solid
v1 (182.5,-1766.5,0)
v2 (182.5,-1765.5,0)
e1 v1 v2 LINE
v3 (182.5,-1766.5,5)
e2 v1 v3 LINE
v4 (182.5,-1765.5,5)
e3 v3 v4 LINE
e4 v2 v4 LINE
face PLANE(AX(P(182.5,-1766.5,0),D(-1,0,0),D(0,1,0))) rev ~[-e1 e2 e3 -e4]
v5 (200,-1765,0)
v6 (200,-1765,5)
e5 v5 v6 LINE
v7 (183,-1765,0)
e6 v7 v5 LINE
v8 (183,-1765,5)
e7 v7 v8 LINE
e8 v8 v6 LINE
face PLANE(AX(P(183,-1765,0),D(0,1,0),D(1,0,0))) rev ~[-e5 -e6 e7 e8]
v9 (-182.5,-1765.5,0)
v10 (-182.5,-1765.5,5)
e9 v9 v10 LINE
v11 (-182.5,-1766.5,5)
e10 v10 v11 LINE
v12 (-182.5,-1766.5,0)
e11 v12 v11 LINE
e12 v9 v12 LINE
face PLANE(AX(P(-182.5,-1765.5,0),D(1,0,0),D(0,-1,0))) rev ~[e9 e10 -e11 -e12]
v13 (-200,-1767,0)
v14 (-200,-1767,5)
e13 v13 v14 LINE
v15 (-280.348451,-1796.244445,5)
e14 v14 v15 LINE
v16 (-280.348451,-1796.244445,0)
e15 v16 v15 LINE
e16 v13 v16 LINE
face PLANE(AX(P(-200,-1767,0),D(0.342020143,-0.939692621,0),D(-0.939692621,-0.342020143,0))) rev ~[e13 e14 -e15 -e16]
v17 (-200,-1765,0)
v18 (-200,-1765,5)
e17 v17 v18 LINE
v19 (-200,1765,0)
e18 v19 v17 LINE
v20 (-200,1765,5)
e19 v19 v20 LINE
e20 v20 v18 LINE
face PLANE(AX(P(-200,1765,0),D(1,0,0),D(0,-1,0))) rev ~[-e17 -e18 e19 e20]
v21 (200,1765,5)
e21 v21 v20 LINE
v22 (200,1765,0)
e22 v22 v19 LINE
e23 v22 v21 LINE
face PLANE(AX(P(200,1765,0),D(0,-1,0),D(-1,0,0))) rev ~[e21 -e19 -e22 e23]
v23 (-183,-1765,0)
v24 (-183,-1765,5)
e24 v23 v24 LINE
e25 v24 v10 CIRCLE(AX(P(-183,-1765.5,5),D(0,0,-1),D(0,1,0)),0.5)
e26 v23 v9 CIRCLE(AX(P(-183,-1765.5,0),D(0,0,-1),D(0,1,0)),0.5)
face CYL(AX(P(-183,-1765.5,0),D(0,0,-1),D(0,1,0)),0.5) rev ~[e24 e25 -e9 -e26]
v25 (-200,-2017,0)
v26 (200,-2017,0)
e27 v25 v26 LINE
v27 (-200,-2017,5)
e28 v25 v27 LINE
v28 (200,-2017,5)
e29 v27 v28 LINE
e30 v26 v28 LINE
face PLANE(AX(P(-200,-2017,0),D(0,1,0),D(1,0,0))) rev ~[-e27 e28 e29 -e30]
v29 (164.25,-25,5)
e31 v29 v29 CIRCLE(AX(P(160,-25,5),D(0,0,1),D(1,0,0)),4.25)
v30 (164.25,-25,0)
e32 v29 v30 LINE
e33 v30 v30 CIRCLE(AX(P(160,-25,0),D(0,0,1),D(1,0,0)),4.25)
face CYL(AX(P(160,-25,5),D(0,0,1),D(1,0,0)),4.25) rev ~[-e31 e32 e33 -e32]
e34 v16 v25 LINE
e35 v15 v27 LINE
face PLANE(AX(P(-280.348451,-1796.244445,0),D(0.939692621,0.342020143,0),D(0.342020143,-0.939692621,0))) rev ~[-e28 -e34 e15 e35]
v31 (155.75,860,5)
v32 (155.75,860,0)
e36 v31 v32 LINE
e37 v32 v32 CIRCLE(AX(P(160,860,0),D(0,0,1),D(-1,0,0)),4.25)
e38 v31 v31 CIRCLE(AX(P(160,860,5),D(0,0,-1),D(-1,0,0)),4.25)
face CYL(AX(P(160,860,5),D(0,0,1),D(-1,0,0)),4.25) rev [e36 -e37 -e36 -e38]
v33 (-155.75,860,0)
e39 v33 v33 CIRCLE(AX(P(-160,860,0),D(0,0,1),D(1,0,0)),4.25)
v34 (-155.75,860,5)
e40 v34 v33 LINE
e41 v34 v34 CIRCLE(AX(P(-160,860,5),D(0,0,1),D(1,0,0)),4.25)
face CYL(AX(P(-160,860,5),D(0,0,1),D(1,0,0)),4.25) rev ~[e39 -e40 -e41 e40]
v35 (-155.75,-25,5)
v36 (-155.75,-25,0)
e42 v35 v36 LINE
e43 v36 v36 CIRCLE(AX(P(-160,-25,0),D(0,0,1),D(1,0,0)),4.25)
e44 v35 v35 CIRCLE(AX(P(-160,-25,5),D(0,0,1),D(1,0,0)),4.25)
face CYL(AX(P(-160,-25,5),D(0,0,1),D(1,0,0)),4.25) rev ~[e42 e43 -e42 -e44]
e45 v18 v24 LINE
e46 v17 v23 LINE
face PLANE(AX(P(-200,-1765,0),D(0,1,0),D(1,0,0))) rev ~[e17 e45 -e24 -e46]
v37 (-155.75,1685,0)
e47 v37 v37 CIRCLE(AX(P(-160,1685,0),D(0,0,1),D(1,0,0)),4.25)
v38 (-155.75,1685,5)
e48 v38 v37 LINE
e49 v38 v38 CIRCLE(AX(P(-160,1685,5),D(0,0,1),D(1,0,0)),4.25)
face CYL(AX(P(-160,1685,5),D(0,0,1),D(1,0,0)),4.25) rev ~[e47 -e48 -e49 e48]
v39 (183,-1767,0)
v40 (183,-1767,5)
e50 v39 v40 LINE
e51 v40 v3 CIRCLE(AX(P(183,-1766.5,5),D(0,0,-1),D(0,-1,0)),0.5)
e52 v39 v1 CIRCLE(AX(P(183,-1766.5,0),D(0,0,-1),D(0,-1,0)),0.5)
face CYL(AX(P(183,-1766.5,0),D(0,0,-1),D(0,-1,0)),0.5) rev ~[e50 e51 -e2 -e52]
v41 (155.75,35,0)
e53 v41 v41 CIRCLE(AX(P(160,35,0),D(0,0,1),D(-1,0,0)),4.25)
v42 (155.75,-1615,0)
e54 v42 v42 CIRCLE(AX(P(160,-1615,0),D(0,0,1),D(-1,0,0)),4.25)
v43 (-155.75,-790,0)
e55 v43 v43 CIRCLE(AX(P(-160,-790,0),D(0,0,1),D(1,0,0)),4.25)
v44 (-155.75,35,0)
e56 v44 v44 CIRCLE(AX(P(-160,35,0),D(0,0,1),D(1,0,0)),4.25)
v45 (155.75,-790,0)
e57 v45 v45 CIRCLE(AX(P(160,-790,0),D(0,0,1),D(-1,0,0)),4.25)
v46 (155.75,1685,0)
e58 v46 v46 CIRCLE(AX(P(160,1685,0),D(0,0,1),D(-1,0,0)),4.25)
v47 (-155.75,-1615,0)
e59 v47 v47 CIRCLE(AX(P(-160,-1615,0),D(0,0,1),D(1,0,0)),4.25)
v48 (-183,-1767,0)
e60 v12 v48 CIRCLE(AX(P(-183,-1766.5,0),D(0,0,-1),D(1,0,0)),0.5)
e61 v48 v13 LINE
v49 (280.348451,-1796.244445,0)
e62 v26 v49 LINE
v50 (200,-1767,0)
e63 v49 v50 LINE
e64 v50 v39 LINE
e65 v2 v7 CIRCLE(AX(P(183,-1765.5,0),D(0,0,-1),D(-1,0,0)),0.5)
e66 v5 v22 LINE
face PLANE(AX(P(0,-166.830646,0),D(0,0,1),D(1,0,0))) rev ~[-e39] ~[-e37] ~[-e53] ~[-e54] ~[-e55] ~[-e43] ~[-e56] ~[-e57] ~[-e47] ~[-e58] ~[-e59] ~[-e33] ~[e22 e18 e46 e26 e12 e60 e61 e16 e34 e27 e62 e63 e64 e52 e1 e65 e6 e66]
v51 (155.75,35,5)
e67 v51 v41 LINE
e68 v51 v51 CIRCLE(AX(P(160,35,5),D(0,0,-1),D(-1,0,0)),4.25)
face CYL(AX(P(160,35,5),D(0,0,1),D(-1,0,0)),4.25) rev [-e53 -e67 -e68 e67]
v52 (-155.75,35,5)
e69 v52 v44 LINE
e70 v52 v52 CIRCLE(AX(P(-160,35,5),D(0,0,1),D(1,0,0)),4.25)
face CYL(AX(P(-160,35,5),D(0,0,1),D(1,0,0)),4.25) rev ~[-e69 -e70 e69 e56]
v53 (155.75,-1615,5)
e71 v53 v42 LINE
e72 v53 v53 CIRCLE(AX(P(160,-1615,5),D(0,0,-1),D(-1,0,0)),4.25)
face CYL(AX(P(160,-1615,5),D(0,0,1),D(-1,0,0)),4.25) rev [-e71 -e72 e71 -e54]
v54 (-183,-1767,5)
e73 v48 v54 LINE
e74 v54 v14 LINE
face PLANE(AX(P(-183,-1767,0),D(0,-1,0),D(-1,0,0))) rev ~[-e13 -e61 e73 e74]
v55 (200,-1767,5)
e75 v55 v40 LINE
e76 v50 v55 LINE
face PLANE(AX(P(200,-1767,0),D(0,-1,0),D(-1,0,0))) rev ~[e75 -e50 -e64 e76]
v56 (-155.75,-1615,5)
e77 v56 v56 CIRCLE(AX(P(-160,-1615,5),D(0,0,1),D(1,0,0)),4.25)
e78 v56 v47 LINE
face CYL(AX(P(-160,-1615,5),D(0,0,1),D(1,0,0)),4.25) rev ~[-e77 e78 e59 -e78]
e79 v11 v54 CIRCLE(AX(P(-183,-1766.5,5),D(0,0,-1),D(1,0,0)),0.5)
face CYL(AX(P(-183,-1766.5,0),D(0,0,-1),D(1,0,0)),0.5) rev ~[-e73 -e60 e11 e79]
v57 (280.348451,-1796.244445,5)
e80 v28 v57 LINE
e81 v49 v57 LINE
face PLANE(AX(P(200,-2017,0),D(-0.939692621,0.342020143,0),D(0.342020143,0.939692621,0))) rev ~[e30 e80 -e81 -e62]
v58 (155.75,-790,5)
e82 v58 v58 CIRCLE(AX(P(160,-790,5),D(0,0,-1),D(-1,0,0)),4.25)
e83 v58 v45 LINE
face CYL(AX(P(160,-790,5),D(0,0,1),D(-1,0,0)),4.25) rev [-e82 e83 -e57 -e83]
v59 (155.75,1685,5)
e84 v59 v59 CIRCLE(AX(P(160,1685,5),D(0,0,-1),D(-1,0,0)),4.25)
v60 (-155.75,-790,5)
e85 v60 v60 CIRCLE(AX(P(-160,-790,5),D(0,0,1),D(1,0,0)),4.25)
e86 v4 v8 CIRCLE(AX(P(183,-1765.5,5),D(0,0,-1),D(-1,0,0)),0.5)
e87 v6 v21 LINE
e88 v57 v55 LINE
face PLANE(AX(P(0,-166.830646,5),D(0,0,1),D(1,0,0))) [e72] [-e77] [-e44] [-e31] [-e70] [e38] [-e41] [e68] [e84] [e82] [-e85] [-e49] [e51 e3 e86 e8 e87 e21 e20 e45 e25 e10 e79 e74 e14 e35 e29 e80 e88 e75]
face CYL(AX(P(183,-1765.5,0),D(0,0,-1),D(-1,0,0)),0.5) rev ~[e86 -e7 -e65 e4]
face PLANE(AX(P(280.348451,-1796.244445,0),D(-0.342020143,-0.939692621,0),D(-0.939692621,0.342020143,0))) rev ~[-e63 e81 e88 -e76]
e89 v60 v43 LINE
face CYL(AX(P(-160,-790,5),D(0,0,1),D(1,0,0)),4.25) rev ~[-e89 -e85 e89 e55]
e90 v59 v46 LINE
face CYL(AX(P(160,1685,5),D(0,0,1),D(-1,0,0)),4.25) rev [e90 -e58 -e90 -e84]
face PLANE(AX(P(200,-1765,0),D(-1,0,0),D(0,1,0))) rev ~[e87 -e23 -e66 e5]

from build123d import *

# Parameters (mm, degrees)
F1_DEPTH = 5
F2_R     = 4.25
F3_DEPTH = 5.001
F4_R     = 4.25
F5_DEPTH = 5.001


# Not quite as in the source:
# - a pattern or mirror of a feature is missing from the dataset's text; its kind, count and spacing are read off the source's solid


with BuildPart() as f1:
    # F0 (on Top) → F1 (new body)
    with BuildSketch(Plane.XY):
        with BuildLine():
            Line((200, -1765), (200, 1765))
            Line((200, 1765), (-200, 1765))
            Line((-200, 1765), (-200, -1765))
            Line((-200, -1765), (-183, -1765))
            ThreePointArc((-183, -1765), (-182.6464466094, -1765.1464466094), (-182.5, -1765.5))
            Line((-182.5, -1765.5), (-182.5, -1766.5))
            ThreePointArc((-182.5, -1766.5), (-182.6464466094, -1766.8535533906), (-183, -1767))
            Line((-183, -1767), (-200, -1767))
            Line((-200, -1767), (-280.3484512108, -1796.2444446101))
            Line((-280.3484512108, -1796.2444446101), (-200, -2017))
            Line((-200, -2017), (200, -2017))
            Line((200, -2017), (280.3484512108, -1796.2444446101))
            Line((280.3484512108, -1796.2444446101), (200, -1767))
            Line((200, -1767), (183, -1767))
            ThreePointArc((183, -1767), (182.6464466094, -1766.8535533906), (182.5, -1766.5))
            Line((182.5, -1766.5), (182.5, -1765.5))
            ThreePointArc((182.5, -1765.5), (182.6464466094, -1765.1464466094), (183, -1765))
            Line((183, -1765), (200, -1765))
        make_face()
    extrude(amount=F1_DEPTH)

    # F2 (on face) → F3 (cut, through all)
    with BuildSketch(Plane.XY.offset(5)):
        with Locations((-160, 1685)):
            Circle(F2_R)
        with Locations((-160, 860)):
            Circle(F2_R)
        with Locations((-160, 35)):
            Circle(F2_R)
        with Locations((-160, -790)):
            Circle(F2_R)
        with Locations((-160, -1615)):
            Circle(F2_R)
    f3 = extrude(amount=-F3_DEPTH, mode=Mode.SUBTRACT)

    # F3_copies: F3 across plane
    add(f3.mirror(Plane(origin=(0, 0, 0), x_dir=(0, 0, 1), z_dir=(1, 0, 0))), mode=Mode.SUBTRACT)

    # F4 (on face) → F5 (cut, through all)
    with BuildSketch(Plane.XY.offset(5)):
        with Locations((-160, -25)):
            Circle(F4_R)
        with Locations((160, -25)):
            Circle(F4_R)
    extrude(amount=-F5_DEPTH, mode=Mode.SUBTRACT)


solid = f1.part
